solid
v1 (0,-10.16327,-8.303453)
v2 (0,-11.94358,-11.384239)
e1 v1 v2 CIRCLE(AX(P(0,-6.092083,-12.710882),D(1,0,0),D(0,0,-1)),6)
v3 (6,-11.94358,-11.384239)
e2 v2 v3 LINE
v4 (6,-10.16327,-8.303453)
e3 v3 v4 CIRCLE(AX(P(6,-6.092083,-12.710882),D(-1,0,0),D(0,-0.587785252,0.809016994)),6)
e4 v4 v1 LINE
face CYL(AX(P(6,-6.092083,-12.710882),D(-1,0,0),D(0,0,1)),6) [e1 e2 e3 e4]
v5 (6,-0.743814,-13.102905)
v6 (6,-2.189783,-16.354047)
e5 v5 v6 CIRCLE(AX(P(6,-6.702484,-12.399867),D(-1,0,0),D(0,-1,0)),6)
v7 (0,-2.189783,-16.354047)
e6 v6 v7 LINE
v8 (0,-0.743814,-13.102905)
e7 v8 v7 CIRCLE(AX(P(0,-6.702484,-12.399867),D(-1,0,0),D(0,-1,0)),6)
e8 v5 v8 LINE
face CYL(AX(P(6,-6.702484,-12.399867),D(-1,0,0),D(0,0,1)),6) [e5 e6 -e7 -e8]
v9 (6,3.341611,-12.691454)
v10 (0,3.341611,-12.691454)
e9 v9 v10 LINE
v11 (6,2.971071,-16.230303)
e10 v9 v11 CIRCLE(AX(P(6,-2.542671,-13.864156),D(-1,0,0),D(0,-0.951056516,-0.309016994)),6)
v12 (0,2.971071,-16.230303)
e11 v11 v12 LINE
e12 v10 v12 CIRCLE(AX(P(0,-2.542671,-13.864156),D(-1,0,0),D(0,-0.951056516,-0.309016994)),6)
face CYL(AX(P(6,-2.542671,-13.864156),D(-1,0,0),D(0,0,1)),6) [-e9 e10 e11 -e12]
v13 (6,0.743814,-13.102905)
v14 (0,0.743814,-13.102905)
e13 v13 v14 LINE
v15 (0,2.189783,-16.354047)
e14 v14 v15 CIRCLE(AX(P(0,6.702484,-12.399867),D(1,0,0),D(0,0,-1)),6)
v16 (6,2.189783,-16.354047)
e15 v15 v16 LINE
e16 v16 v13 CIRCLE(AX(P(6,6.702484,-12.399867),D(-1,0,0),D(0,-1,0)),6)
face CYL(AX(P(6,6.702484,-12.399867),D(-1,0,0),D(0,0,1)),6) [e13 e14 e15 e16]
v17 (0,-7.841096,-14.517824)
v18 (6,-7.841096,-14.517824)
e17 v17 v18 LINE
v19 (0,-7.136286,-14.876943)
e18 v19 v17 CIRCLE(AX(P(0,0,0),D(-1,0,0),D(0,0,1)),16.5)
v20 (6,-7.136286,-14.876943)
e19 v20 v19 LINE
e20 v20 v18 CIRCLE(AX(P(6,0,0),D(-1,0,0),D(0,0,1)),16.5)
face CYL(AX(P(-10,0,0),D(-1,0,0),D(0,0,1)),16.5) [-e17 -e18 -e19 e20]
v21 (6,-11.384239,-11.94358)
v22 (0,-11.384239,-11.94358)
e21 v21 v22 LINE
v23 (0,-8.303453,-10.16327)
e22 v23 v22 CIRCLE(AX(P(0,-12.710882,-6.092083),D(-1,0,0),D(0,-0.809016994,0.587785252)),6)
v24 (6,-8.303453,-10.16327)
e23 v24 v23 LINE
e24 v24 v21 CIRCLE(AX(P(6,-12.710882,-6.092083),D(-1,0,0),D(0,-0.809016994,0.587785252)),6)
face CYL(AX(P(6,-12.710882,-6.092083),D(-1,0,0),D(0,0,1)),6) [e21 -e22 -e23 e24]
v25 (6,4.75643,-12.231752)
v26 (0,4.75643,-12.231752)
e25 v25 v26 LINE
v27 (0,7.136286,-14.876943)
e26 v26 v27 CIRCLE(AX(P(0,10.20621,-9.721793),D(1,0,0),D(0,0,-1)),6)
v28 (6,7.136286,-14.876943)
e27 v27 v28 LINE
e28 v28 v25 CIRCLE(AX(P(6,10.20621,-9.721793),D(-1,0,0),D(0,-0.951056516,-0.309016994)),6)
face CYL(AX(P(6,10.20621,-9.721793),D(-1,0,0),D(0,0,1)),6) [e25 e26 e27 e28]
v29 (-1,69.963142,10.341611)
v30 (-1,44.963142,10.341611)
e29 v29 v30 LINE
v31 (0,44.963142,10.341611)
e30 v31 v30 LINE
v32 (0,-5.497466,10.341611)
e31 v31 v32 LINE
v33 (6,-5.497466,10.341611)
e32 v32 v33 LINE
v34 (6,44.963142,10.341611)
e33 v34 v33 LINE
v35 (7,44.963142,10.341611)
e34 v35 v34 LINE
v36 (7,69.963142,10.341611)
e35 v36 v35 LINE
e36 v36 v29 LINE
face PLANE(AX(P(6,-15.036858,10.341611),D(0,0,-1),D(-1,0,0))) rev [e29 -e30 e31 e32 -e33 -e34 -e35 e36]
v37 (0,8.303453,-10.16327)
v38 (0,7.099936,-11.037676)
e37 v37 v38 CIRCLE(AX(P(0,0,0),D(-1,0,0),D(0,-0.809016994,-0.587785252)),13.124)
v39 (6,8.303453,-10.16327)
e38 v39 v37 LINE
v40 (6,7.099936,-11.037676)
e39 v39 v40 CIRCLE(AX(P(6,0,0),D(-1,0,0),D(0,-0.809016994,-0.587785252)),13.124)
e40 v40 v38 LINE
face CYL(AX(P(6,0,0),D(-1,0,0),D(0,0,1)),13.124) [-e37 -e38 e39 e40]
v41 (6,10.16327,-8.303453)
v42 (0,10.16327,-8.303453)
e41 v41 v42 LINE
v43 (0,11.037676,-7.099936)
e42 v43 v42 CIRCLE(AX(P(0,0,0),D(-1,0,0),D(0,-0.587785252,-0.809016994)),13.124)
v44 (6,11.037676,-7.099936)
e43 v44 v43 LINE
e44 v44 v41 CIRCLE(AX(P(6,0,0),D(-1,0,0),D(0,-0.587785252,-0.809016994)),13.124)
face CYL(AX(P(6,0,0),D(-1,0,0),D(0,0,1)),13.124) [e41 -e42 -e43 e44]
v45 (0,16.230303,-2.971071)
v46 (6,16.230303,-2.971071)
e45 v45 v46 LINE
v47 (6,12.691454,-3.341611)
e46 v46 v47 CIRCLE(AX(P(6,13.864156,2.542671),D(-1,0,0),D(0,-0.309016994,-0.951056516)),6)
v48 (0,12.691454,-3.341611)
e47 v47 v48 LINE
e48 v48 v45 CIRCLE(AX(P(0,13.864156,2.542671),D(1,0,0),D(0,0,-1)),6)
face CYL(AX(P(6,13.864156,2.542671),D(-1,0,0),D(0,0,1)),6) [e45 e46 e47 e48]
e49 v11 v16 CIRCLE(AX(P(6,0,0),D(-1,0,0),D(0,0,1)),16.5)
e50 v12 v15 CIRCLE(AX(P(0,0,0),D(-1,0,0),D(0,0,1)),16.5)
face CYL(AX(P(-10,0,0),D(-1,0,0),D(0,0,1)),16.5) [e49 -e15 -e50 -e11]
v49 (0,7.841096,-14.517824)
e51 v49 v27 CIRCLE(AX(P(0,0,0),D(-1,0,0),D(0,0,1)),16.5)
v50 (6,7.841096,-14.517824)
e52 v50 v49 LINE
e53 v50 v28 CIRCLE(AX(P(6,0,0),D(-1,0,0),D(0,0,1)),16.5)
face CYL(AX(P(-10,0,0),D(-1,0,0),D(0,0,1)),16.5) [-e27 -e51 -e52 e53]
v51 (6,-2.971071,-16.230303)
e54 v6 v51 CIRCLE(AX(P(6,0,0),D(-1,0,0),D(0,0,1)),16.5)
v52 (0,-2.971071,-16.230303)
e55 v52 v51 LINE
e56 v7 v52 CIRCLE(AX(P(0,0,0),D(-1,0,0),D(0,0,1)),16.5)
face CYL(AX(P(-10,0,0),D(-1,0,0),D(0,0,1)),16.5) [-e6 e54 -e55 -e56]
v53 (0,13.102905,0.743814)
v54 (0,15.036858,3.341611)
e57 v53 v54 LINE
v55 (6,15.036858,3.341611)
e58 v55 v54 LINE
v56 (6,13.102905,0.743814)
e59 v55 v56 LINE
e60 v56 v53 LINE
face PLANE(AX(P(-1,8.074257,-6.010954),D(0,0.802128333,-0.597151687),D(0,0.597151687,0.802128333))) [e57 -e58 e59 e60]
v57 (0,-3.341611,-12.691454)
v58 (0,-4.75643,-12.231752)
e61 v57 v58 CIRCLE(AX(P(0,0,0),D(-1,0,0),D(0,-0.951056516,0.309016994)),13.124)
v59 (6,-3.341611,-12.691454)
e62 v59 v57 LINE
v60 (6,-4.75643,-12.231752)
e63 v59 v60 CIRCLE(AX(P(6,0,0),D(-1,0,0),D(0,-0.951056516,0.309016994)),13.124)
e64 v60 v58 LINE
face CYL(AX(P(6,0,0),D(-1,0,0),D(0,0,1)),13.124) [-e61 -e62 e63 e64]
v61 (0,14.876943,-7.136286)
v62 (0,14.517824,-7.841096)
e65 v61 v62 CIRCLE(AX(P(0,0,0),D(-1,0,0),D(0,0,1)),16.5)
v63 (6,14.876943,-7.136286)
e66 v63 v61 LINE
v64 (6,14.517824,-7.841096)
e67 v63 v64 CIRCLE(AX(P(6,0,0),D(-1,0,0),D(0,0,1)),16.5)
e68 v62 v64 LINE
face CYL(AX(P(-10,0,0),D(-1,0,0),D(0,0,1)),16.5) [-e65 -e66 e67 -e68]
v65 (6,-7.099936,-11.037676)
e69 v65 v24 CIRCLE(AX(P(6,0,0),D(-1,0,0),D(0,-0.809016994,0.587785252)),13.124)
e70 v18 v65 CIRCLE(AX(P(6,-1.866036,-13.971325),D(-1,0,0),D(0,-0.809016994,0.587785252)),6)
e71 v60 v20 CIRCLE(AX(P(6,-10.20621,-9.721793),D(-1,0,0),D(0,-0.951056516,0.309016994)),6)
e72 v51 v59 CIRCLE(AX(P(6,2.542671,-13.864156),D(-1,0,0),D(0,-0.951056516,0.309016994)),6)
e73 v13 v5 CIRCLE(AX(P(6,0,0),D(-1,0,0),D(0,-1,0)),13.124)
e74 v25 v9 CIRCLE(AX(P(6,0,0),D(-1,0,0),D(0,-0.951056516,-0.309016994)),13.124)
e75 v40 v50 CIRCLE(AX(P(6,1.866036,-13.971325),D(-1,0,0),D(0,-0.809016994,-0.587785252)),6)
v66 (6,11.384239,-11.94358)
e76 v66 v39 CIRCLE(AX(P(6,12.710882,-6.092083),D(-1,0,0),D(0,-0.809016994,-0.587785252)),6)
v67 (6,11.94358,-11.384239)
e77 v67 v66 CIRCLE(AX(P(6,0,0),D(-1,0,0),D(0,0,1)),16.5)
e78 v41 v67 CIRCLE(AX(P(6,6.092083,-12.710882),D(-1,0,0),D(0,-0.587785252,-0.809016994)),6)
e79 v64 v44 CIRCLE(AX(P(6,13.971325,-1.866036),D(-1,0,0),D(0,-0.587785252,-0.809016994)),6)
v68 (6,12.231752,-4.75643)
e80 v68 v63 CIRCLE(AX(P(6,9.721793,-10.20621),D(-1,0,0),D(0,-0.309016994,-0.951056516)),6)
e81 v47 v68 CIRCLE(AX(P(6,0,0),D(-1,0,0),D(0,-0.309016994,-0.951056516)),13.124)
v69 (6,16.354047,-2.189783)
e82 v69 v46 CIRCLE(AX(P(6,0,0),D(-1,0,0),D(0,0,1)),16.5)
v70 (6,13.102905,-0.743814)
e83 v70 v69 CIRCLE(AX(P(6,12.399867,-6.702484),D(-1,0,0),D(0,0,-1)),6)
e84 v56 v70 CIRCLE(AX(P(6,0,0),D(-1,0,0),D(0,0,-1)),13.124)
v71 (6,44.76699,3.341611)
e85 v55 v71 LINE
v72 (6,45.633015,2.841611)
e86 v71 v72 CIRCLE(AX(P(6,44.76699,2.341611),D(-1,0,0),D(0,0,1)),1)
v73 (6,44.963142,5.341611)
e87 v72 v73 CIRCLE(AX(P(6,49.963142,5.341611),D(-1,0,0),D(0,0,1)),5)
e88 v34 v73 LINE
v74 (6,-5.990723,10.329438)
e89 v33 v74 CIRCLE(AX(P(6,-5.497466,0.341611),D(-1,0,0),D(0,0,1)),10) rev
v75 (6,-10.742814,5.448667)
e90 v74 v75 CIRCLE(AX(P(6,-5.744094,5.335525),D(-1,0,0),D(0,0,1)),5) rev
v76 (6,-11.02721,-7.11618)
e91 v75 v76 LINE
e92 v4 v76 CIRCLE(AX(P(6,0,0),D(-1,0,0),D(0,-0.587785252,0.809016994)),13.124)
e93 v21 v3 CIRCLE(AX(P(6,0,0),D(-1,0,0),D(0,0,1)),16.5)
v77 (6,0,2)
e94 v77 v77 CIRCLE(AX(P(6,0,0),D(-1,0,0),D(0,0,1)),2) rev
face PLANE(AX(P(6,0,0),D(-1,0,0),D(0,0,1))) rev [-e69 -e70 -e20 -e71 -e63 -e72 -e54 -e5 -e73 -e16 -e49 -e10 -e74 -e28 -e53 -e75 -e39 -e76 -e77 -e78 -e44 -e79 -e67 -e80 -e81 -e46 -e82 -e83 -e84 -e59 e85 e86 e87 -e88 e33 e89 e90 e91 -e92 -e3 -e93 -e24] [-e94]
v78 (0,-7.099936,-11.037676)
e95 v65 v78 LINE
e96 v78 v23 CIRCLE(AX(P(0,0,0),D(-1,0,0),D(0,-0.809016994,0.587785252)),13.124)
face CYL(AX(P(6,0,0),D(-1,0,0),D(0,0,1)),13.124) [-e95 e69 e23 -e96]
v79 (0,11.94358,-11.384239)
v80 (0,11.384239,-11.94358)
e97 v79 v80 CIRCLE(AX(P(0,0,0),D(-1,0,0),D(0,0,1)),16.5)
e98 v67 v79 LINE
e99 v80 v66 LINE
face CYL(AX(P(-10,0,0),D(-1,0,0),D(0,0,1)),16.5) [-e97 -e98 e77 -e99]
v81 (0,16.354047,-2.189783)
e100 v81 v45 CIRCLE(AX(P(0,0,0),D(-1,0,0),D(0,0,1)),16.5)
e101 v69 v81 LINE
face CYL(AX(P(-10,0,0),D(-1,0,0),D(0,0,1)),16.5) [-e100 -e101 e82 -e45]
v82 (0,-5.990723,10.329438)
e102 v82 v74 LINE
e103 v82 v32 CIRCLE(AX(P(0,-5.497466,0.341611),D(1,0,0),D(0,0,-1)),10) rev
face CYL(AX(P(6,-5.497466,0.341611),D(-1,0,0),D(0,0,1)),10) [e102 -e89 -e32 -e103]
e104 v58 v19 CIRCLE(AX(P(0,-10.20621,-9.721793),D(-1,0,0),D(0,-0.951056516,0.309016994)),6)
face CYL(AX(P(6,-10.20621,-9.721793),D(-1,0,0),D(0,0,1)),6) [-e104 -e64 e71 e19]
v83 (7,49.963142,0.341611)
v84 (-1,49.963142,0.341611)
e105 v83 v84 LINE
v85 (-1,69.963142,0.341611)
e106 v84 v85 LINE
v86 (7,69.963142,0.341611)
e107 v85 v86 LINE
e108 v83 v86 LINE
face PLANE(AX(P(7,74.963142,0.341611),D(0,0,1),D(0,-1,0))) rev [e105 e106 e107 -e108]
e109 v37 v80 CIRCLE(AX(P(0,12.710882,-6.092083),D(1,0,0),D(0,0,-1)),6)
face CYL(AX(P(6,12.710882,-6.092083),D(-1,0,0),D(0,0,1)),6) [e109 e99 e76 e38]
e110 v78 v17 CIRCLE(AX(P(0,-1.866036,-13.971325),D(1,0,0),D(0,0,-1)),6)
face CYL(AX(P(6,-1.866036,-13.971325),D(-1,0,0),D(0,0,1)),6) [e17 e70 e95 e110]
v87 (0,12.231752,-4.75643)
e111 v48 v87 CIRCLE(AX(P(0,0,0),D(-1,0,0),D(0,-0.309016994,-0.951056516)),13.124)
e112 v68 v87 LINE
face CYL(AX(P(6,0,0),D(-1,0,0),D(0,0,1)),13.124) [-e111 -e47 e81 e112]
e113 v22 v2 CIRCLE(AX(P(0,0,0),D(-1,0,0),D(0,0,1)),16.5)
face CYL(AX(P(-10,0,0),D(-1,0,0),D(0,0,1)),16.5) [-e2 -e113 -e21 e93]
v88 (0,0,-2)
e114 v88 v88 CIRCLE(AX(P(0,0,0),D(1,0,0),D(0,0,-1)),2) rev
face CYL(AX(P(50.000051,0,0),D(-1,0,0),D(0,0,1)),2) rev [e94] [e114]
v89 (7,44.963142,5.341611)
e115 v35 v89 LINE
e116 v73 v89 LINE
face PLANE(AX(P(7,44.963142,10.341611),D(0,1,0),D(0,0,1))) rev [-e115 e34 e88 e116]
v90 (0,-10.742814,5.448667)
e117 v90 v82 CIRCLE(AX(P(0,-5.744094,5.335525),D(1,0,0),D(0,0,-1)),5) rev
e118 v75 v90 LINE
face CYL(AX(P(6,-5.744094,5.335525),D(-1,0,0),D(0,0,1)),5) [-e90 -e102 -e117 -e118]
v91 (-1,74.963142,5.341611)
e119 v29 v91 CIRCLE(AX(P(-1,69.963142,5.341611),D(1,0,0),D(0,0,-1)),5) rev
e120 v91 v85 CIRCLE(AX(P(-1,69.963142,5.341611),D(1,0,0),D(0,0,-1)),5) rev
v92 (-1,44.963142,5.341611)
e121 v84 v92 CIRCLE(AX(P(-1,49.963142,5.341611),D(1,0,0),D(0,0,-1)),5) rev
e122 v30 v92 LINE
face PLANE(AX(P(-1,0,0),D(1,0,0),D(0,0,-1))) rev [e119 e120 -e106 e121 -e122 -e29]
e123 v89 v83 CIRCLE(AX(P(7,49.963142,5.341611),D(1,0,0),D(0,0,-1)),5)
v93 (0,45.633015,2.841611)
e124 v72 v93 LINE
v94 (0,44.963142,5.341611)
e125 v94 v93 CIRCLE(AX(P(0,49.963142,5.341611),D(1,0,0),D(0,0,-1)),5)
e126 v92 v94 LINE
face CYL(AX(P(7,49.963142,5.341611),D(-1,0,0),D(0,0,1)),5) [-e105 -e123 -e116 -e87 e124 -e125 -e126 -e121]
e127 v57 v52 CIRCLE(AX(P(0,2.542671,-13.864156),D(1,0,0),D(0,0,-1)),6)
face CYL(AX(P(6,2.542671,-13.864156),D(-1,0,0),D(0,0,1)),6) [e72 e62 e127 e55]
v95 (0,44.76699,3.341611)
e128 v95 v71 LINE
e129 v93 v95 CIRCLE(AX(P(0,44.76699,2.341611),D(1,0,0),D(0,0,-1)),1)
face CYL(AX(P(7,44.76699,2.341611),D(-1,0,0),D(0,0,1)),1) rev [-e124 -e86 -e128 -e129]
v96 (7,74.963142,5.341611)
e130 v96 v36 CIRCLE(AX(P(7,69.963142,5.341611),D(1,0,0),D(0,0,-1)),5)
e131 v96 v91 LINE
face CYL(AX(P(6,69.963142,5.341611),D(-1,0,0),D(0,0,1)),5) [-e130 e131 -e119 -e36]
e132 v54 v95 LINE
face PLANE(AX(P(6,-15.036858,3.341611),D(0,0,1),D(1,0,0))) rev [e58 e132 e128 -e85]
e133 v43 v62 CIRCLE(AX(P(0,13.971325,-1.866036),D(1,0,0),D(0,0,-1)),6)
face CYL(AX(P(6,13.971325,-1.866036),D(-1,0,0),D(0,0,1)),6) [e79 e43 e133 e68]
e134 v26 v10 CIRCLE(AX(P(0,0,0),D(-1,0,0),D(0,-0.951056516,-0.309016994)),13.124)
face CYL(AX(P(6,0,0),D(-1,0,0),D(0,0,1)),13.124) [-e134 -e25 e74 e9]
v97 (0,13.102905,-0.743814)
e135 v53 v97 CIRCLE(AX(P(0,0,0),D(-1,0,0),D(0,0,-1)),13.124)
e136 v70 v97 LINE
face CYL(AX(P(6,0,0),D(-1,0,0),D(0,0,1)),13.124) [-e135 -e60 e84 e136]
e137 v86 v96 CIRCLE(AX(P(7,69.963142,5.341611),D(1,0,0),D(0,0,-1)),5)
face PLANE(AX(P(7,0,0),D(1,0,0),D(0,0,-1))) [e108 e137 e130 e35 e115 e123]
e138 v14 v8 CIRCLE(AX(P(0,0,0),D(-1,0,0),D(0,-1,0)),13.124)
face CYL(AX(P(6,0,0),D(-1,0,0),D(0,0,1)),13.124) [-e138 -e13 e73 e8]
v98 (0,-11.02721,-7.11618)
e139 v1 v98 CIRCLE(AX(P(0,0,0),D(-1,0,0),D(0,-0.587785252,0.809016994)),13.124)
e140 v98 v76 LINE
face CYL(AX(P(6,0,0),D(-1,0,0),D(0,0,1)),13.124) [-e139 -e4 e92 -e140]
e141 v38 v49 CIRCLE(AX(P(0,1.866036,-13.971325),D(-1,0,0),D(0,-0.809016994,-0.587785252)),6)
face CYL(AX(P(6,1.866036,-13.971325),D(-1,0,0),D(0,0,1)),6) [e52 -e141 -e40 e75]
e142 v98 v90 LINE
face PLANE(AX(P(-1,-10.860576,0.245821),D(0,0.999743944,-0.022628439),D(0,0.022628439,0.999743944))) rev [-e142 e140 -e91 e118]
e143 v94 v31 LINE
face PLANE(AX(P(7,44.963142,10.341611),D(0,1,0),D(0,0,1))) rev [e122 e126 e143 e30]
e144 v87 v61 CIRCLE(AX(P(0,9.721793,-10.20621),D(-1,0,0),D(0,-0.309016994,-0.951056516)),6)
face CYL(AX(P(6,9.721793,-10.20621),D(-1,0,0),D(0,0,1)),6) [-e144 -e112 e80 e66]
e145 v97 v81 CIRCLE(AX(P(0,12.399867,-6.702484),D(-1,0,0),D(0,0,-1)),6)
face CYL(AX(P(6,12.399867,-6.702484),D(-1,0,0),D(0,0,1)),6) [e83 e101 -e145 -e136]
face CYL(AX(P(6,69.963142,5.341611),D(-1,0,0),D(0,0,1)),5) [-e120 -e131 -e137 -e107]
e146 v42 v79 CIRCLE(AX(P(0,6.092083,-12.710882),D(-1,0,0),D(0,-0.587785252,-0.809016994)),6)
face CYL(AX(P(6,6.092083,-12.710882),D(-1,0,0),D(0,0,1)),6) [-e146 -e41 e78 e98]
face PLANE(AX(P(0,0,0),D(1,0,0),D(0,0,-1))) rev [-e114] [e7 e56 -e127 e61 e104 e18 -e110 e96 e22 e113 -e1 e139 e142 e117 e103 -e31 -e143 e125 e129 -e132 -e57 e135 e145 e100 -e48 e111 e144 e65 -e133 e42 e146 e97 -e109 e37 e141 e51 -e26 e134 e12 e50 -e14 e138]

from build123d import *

# Parameters (mm, degrees)
BASPROSKE_W         = 6
BASPROSKE_H         = 16.5
TOOTHCUT_DEPTH      = 25.093567606
TEETHCUTS_COUNT     = 20
TEETHCUTS_ANGLE     = 342
BORSKE_R            = 2
BORE_DEPTH          = 50.0000508
SKETCH1_W           = 14.532002023
SKETCH1_H           = 35.225661126
CUT_EXTRUDE1_DEPTH  = 5
SKETCH3_W           = 7
SKETCH3_H           = 90
BOSS_EXTRUDE2_DEPTH = 3
SKETCH4_W           = 10
SKETCH4_H           = 30
BOSS_EXTRUDE3_DEPTH = 4
FILLET1_R           = 10
FILLET4_R           = 5
FILLET5_R           = 1
CUT_EXTRUDE4_DEPTH  = 4
CUT_EXTRUDE6_DEPTH  = 4
FILLET6_R           = 5


with BuildPart() as part:
    # BasProSke → Base-Revolve (revolve)
    with BuildSketch(Plane(origin=(0, 0, 0), x_dir=(1, 0, 0), z_dir=(0, 1, 0)), mode=Mode.PRIVATE) as base_revolve_sk:
        with Locations((3, 8.25)):
            Rectangle(BASPROSKE_W, BASPROSKE_H)
    revolve(base_revolve_sk.sketch.rotate(Axis((-10, 0, 0), (1, 0, 0)), 180), axis=Axis((-10, 0, 0), (1, 0, 0)))

    # TooCutSke → ToothCut (cut, through all)
    with BuildSketch(Plane(origin=(0, 0, 0), x_dir=(0, 0, -1), z_dir=(1, 0, 0))):
        with BuildLine():
            ThreePointArc((0.74381438, 13.102904875), (0, 13.124), (-0.74381438, 13.102904875))
            ThreePointArc((-0.74381438, 13.102904875), (-1.226473103, 14.852072512), (-2.209965745, 16.376962373))
            ThreePointArc((-2.209965745, 16.376962373), (0, 16.5254), (2.209965745, 16.376962373))
            ThreePointArc((2.209965745, 16.376962373), (1.226473103, 14.852072512), (0.74381438, 13.102904875))
        make_face()
    toothcut = extrude(amount=TOOTHCUT_DEPTH, mode=Mode.SUBTRACT)

    # TeethCuts: ToothCut ×20 about axis
    teethcuts_axis = Axis((-10, 0, 0), (1, 0, 0))
    for i in range(1, TEETHCUTS_COUNT):
        add(toothcut.rotate(teethcuts_axis, i * TEETHCUTS_ANGLE / (TEETHCUTS_COUNT - 1)), mode=Mode.SUBTRACT)

    # BorSke → Bore (cut, symmetric)
    with BuildSketch(Plane(origin=(0, 0, 0), x_dir=(0, 0, -1), z_dir=(1, 0, 0))):
        with Locations(Location((0, 0, 0), (0, 0, 180))):
            Circle(BORSKE_R)
    extrude(amount=BORE_DEPTH, both=True, mode=Mode.SUBTRACT)

    # Sketch1 → Cut-Extrude1 (cut, symmetric)
    with BuildSketch(Plane(origin=(3, 0, 0), x_dir=(0, 0, -1), z_dir=(1, 0, 0))):
        with Locations((-10.60761178, 0.822467031)):
            Rectangle(SKETCH1_W, SKETCH1_H)
    extrude(amount=CUT_EXTRUDE1_DEPTH, both=True, mode=Mode.SUBTRACT)

    # Sketch3 → Boss-Extrude2 (add, symmetric)
    with BuildSketch(Plane(origin=(3, 0, 0), x_dir=(0, 0, -1), z_dir=(1, 0, 0))):
        with Locations((-6.841610769, 29.963142125)):
            Rectangle(SKETCH3_W, SKETCH3_H)
    extrude(amount=BOSS_EXTRUDE2_DEPTH, both=True)

    # Sketch4 → Boss-Extrude3 (add, symmetric)
    with BuildSketch(Plane(origin=(3, 0, 0), x_dir=(0, 0, -1), z_dir=(1, 0, 0))):
        with Locations((-5.341610769, 59.963142125)):
            Rectangle(SKETCH4_W, SKETCH4_H)
    extrude(amount=BOSS_EXTRUDE3_DEPTH, both=True)

    # Fillet1
    # the kernel refuses this fillet: 10 mm, written as the material it takes off along each edge
    with BuildSketch(Plane(origin=(29.848480035, -15.036857875, 10.341610769), x_dir=(0, 0, -1), z_dir=(-1, 0, 0))) as fillet1_piece_1:
        with BuildLine():
            CenterArc((10, -9.539392014), FILLET1_R, 107.457603124, 72.542396876)
            Line((0, -9.539392014), (-0.2, -9.539392014))
            Line((-0.2, -9.539392014), (-0.2, 0))
            Line((-0.2, 0), (0, 0.2))
            ThreePointArc((0, 0.2), (3.5, 0.2), (6.94, 0.19078784))
            Line((6.94, 0.19078784), (7, 0))
        make_face()
    extrude(amount=53.696960071, mode=Mode.SUBTRACT)

    # Fillet4
    # the kernel refuses this fillet: 5 mm, written as the material it takes off along each edge
    with BuildSketch(Plane(origin=(19.5, 44.963142125, 0.341610769), x_dir=(0, 0, 1), z_dir=(-1, 0, 0))) as fillet4_piece_1_section:
        with BuildLine():
            CenterArc((FILLET4_R, FILLET4_R), FILLET4_R, 180, 90)
            Line((0, FILLET4_R), (0, 0))
            Line((0, 0), (FILLET4_R, 0))
        make_face()
    fillet4_piece_1 = extrude(amount=33, mode=Mode.PRIVATE)
    fillet4_piece_1 = split(fillet4_piece_1, bisect_by=Plane(origin=(12.75, 45.013801365, 3.341610769), z_dir=(0, 0, 1)), keep=Keep.TOP, mode=Mode.PRIVATE)
    fillet4_piece_1 = split(fillet4_piece_1, bisect_by=Plane(origin=(6, 45.013801365, 4.050354099), z_dir=(1, 0, 0)), keep=Keep.TOP, mode=Mode.PRIVATE)
    add(fillet4_piece_1, mode=Mode.SUBTRACT)
    with BuildSketch(Plane(origin=(19.5, 44.963142125, 0.341610769), x_dir=(0, 0, 1), z_dir=(-1, 0, 0))) as fillet4_piece_2_section:
        with BuildLine():
            CenterArc((FILLET4_R, FILLET4_R), FILLET4_R, 180, 90)
            Line((0, FILLET4_R), (0, 0))
            Line((0, 0), (FILLET4_R, 0))
        make_face()
    fillet4_piece_2 = extrude(amount=33, mode=Mode.PRIVATE)
    fillet4_piece_2 = split(fillet4_piece_2, bisect_by=Plane(origin=(12.75, 46.181868003, 3.341610769), z_dir=(0, 0, -1)), keep=Keep.TOP, mode=Mode.PRIVATE)
    fillet4_piece_2 = split(fillet4_piece_2, bisect_by=Plane(origin=(6, 46.181868003, 1.266861087), z_dir=(1, 0, 0)), keep=Keep.TOP, mode=Mode.PRIVATE)
    add(fillet4_piece_2, mode=Mode.SUBTRACT)
    with BuildSketch(Plane(origin=(19.5, 44.963142125, 0.341610769), x_dir=(0, 0, 1), z_dir=(-1, 0, 0))) as fillet4_piece_3_section:
        with BuildLine():
            CenterArc((FILLET4_R, FILLET4_R), FILLET4_R, 180, 90)
            Line((0, FILLET4_R), (0, 0))
            Line((0, 0), (FILLET4_R, 0))
        make_face()
    fillet4_piece_3 = extrude(amount=33, mode=Mode.PRIVATE)
    fillet4_piece_3 = split(fillet4_piece_3, bisect_by=Plane(origin=(0, 46.181868003, 1.266861087), z_dir=(1, 0, 0)), keep=Keep.TOP, mode=Mode.PRIVATE)
    fillet4_piece_3 = split(fillet4_piece_3, bisect_by=Plane(origin=(3, 46.181868003, 3.341610769), z_dir=(0, 0, -1)), keep=Keep.TOP, mode=Mode.PRIVATE)
    fillet4_piece_3 = split(fillet4_piece_3, bisect_by=Plane(origin=(6, 46.181868003, 1.266861087), z_dir=(-1, 0, 0)), keep=Keep.TOP, mode=Mode.PRIVATE)
    add(fillet4_piece_3, mode=Mode.SUBTRACT)
    with BuildSketch(Plane(origin=(19.5, 44.963142125, 0.341610769), x_dir=(0, 0, 1), z_dir=(-1, 0, 0))) as fillet4_piece_4_section:
        with BuildLine():
            CenterArc((FILLET4_R, FILLET4_R), FILLET4_R, 180, 90)
            Line((0, FILLET4_R), (0, 0))
            Line((0, 0), (FILLET4_R, 0))
        make_face()
    fillet4_piece_4 = extrude(amount=33, mode=Mode.PRIVATE)
    fillet4_piece_4 = split(fillet4_piece_4, bisect_by=Plane(origin=(0, 45.013801365, 4.050354099), z_dir=(-1, 0, 0)), keep=Keep.TOP, mode=Mode.PRIVATE)
    fillet4_piece_4 = split(fillet4_piece_4, bisect_by=Plane(origin=(-6.75, 45.013801365, 3.341610769), z_dir=(0, 0, 1)), keep=Keep.TOP, mode=Mode.PRIVATE)
    add(fillet4_piece_4, mode=Mode.SUBTRACT)
    with BuildSketch(Plane(origin=(19.5, 44.963142125, 0.341610769), x_dir=(0, 0, 1), z_dir=(-1, 0, 0))) as fillet4_piece_5_section:
        with BuildLine():
            CenterArc((FILLET4_R, FILLET4_R), FILLET4_R, 180, 90)
            Line((0, FILLET4_R), (0, 0))
            Line((0, 0), (FILLET4_R, 0))
        make_face()
    fillet4_piece_5 = extrude(amount=33, mode=Mode.PRIVATE)
    fillet4_piece_5 = split(fillet4_piece_5, bisect_by=Plane(origin=(0, 46.181868003, 1.266861087), z_dir=(-1, 0, 0)), keep=Keep.TOP, mode=Mode.PRIVATE)
    fillet4_piece_5 = split(fillet4_piece_5, bisect_by=Plane(origin=(-6.75, 46.181868003, 3.341610769), z_dir=(0, 0, -1)), keep=Keep.TOP, mode=Mode.PRIVATE)
    add(fillet4_piece_5, mode=Mode.SUBTRACT)
    with BuildSketch(Plane(origin=(19.5, 74.963142125, 10.341610769), x_dir=(0, -1, 0), z_dir=(-1, 0, 0))) as fillet4_piece_6:
        with BuildLine():
            CenterArc((FILLET4_R, -FILLET4_R), FILLET4_R, 90, 90)
            Line((0, -FILLET4_R), (0, 0))
            Line((0, 0), (FILLET4_R, 0))
        make_face()
    extrude(amount=33, mode=Mode.SUBTRACT)
    with BuildSketch(Plane(origin=(19.5, 74.963142125, 0.341610769), x_dir=(0, -1, 0), z_dir=(-1, 0, 0))) as fillet4_piece_7:
        with BuildLine():
            CenterArc((FILLET4_R, FILLET4_R), FILLET4_R, 180, 90)
            Line((0, FILLET4_R), (0, 0))
            Line((0, 0), (FILLET4_R, 0))
        make_face()
    extrude(amount=33, mode=Mode.SUBTRACT)

    # Fillet5
    fillet5_edges = [part.edges().sort_by_distance(p)[0] for p in [
        (3, 45.38056643, 3.341610769),
    ]]
    fillet(fillet5_edges, radius=FILLET5_R)

    # Sketch5 → Cut-Extrude4 (cut, symmetric)
    with BuildSketch(Plane(origin=(3, 0, 0), x_dir=(0, 0, -1), z_dir=(1, 0, 0))):
        Polygon((-0.646757919, 13.233276671), (-0.74381438, 13.102904875), (-3.341610769, 15.036857875), (-3.193884675, 16.241167121), (-1.325890901, 16.884807614), align=None)
    extrude(amount=CUT_EXTRUDE4_DEPTH, both=True, mode=Mode.SUBTRACT)

    # Sketch7 → Cut-Extrude6 (cut, symmetric)
    with BuildSketch(Plane(origin=(3, 0, 0), x_dir=(0, 0, -1), z_dir=(1, 0, 0))):
        Polygon((-7.363012022, -15.230284447), (-8.903180744, -10.664623645), (7.578586785, -11.037675843), (10.397777633, -17.422865984), (-4.980223066, -17.422865984), align=None)
    extrude(amount=CUT_EXTRUDE6_DEPTH, both=True, mode=Mode.SUBTRACT)

    # Fillet6
    fillet6_edges = [part.edges().sort_by_distance(p)[0] for p in [
        (3, -10.664623645, 8.903180744),
    ]]
    fillet(fillet6_edges, radius=FILLET6_R)


solid = part.part
